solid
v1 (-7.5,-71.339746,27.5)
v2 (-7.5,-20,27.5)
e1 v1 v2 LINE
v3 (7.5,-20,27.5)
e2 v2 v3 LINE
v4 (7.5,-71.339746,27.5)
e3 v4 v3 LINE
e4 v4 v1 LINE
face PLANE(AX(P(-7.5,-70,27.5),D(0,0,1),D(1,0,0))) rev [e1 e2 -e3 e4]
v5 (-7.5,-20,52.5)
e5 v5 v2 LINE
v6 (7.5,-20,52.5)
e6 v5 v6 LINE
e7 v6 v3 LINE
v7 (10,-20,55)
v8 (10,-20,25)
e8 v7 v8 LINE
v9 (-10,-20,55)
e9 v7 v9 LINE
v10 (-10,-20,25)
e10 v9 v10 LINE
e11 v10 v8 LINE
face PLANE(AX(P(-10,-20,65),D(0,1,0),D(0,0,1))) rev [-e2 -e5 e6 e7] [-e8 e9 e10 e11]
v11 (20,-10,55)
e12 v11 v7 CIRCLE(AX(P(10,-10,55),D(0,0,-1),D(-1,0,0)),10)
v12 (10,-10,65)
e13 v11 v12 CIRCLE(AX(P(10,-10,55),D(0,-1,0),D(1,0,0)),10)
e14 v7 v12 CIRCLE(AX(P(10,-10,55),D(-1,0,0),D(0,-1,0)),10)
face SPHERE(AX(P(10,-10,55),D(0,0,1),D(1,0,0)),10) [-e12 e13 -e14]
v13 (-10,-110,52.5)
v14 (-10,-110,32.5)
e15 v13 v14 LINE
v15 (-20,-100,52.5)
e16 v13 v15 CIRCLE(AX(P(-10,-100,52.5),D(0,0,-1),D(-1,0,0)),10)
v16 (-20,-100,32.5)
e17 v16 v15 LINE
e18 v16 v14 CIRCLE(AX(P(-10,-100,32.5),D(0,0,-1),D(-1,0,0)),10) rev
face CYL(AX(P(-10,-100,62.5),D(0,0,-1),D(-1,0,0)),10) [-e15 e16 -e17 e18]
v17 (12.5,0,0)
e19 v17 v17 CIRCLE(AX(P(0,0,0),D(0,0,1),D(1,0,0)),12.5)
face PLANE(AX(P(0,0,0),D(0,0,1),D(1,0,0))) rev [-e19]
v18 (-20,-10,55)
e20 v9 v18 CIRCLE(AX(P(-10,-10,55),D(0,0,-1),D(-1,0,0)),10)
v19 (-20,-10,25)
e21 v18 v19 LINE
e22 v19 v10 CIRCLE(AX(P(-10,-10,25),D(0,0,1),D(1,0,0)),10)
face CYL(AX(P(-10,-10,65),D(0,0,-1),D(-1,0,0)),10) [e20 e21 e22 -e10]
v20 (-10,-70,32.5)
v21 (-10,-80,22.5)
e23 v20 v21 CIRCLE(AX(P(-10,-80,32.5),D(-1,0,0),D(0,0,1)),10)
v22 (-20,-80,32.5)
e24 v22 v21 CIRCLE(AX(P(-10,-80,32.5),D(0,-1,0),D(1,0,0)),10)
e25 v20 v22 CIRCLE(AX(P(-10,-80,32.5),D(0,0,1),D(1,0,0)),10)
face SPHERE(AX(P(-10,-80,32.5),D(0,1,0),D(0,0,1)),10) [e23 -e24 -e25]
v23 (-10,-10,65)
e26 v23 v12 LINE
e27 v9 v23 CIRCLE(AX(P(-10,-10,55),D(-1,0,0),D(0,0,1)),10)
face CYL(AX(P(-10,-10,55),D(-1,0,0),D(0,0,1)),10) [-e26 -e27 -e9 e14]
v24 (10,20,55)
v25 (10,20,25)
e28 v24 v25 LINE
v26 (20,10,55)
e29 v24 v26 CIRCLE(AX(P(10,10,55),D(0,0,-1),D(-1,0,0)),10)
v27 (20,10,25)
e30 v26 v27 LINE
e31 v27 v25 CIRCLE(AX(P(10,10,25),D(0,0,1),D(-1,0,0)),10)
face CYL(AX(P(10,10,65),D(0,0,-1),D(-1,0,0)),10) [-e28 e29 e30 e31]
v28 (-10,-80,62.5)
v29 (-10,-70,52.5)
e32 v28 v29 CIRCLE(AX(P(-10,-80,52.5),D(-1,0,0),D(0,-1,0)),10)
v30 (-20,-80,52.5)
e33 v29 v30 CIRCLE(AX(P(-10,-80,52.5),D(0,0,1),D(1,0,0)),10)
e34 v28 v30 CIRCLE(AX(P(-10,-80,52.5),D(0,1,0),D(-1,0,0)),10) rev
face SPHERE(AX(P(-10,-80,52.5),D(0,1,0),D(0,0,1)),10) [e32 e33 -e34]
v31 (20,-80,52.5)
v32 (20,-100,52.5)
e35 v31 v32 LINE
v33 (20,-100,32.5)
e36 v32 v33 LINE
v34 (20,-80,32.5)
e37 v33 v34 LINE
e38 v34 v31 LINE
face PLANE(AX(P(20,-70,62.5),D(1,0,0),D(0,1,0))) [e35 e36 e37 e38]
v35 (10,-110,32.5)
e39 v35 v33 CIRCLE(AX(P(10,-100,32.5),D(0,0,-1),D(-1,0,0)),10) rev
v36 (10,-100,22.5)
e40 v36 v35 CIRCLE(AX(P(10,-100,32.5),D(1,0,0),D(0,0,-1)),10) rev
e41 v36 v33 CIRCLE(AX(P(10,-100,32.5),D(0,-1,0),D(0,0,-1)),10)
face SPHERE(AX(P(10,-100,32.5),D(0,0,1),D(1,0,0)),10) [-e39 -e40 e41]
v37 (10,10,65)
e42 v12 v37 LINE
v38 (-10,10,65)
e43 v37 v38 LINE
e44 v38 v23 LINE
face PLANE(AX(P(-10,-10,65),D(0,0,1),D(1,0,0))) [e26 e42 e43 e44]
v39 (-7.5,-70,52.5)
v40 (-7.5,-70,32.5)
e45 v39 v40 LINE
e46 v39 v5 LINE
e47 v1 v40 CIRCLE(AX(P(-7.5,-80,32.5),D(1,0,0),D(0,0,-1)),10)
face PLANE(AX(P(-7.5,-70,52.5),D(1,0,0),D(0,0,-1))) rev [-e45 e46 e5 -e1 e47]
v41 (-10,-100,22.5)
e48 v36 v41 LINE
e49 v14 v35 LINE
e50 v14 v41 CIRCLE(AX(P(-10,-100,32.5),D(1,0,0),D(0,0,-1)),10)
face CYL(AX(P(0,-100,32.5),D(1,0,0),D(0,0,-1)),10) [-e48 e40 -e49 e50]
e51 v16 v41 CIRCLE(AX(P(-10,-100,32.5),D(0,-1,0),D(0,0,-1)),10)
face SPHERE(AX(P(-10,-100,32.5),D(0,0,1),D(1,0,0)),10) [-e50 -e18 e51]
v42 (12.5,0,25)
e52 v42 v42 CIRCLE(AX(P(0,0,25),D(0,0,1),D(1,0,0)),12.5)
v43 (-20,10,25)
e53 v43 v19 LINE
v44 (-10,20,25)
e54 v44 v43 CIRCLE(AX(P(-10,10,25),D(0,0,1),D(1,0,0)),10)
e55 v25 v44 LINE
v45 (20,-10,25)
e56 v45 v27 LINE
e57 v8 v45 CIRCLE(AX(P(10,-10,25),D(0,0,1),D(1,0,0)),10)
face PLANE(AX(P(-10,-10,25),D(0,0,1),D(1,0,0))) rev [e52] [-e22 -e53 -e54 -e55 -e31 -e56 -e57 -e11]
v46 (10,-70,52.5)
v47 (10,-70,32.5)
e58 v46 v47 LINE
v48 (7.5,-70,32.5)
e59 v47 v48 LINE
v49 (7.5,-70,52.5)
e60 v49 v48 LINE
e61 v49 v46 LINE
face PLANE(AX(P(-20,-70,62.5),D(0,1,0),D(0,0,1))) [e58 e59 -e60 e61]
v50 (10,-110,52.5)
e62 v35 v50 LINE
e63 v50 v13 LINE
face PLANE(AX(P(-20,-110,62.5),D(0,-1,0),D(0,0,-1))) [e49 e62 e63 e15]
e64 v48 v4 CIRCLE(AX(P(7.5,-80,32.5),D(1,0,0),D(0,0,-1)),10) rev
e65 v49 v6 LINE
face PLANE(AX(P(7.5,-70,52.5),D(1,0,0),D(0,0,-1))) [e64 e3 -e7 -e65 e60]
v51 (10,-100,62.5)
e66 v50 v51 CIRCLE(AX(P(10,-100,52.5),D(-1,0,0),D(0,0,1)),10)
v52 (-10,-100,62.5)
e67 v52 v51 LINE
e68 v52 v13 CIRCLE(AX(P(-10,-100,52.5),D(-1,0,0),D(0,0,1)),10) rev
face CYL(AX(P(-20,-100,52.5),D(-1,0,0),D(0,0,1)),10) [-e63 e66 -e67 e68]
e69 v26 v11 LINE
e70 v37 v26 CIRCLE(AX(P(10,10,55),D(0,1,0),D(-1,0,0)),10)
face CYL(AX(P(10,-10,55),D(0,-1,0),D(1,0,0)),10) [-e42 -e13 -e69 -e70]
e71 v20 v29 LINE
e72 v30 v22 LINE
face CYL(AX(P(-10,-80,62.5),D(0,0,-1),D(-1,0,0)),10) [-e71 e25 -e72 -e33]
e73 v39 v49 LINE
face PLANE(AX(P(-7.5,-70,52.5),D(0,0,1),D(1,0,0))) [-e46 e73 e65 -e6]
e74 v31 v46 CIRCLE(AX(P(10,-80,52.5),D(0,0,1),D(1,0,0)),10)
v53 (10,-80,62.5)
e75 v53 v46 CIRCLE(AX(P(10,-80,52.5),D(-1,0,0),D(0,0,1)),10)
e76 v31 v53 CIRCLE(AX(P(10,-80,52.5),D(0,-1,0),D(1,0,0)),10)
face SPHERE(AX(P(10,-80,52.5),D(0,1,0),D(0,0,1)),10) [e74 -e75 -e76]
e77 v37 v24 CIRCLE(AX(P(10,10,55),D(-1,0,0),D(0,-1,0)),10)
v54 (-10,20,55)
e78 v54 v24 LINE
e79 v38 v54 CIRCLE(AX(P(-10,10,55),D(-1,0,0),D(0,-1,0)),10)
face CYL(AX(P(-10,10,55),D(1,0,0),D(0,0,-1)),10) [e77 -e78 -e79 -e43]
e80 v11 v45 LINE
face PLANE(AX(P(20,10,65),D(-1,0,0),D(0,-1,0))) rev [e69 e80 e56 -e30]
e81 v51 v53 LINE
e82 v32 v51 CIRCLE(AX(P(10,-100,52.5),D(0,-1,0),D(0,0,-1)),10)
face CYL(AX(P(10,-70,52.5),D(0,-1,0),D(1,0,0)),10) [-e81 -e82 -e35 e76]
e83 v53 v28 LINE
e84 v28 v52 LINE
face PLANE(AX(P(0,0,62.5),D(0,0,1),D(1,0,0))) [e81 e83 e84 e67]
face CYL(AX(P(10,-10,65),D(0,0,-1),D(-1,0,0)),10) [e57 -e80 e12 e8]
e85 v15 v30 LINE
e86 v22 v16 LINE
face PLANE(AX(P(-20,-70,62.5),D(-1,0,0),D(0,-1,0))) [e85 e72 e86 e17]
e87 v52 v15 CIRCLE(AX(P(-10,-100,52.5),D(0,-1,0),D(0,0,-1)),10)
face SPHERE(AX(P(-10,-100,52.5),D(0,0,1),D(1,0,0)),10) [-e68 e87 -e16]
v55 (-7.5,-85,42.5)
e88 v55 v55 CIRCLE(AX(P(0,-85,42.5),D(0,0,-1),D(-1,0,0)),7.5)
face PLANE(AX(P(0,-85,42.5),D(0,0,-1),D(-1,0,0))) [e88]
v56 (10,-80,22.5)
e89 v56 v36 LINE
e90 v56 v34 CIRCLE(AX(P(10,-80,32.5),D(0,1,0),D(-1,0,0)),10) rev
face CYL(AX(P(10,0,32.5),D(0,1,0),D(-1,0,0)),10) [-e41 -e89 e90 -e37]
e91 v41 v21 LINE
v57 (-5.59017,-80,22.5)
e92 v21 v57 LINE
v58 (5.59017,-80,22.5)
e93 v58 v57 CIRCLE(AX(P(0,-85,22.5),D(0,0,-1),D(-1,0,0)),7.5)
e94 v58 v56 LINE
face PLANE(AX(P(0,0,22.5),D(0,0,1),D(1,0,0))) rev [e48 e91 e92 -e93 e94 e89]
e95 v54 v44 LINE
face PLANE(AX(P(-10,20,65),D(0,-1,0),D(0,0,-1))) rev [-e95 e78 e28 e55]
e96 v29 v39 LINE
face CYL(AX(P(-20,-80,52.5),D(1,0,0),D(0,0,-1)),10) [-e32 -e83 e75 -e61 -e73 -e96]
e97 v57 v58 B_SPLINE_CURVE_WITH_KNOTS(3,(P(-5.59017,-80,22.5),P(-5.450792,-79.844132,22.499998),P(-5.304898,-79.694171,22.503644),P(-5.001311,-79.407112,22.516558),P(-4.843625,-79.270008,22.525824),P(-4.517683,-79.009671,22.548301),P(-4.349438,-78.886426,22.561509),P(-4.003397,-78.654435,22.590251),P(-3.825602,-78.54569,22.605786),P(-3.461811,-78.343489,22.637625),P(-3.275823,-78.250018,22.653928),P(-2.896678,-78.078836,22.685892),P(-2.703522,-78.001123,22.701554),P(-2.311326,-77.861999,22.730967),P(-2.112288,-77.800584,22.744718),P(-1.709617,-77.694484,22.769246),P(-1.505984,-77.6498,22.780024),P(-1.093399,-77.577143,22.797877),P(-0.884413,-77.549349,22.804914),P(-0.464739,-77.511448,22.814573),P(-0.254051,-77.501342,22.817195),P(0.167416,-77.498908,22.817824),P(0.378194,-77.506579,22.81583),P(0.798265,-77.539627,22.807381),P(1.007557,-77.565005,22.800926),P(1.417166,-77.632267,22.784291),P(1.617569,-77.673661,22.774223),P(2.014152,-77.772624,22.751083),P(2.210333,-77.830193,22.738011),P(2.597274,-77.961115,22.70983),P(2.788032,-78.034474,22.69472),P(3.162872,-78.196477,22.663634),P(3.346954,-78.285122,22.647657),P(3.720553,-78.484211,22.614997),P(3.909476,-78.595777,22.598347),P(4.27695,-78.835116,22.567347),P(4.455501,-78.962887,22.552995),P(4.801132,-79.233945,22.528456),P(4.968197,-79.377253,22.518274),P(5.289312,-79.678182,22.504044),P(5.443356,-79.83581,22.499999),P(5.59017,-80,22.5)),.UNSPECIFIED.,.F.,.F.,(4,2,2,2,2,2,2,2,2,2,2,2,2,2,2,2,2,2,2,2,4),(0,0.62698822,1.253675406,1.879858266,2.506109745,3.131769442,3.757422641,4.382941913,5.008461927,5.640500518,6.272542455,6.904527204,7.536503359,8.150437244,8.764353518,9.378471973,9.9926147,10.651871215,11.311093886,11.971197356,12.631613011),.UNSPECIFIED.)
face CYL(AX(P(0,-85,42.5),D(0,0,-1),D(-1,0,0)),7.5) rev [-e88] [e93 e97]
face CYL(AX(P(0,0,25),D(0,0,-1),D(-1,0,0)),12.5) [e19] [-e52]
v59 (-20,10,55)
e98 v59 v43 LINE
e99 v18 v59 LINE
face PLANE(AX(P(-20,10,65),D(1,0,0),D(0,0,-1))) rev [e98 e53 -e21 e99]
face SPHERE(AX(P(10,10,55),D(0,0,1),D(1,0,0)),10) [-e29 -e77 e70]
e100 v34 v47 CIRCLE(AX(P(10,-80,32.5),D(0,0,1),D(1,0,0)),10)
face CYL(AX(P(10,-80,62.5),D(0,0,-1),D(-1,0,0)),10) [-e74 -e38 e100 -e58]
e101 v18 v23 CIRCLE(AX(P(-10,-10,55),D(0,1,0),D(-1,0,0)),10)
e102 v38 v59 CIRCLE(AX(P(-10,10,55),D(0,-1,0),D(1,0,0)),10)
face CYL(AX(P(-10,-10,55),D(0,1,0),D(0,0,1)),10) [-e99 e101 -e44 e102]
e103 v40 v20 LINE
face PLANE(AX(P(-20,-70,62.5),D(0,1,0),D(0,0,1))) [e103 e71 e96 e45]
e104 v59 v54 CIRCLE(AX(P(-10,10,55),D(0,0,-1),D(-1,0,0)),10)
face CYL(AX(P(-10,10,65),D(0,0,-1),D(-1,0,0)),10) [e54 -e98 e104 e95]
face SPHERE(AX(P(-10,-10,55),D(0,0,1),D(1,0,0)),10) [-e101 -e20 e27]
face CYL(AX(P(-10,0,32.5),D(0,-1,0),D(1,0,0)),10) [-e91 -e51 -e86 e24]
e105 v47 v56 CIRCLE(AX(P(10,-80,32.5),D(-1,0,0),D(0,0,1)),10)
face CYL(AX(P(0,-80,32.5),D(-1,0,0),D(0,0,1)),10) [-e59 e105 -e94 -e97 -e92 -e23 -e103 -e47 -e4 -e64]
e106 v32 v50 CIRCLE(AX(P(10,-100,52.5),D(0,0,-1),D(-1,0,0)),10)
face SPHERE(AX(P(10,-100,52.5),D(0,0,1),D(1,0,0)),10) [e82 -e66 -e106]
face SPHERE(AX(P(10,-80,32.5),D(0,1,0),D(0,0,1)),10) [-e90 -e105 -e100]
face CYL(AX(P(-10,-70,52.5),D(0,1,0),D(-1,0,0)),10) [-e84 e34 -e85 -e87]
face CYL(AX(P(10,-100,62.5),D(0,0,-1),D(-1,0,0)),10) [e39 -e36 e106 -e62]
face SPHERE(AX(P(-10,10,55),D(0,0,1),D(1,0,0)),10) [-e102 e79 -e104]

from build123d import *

# Parameters (mm, degrees)
ESQUISSE1_R             = 12.5
BOSS_EXTRU_1_DEPTH      = 25
BOSS_EXTRU_2_DEPTH      = 40
CONG_1_R                = 10
ESQUISSE5_W             = 15
ESQUISSE5_H             = 25
BOSS_EXTRU_3_DEPTH      = 50
BOSS_EXTRU_4_DEPTH      = 5
BOSS_EXTRU_4_DEPTH_BACK = 35
ESQUISSE6_W             = 40
ESQUISSE6_H             = 40
CONG_2_R                = 10
CONG_3_R                = 10
ESQUISSE8_R             = 7.5
ENL_V_MAT_EXTRU_2_DEPTH = 20
CONG_4_R                = 10


with BuildPart() as part:
    # Esquisse1 → Boss.-Extru.1 (new body)
    with BuildSketch(Plane.XY):
        Circle(ESQUISSE1_R)
    extrude(amount=BOSS_EXTRU_1_DEPTH)

    # Esquisse2 → Boss.-Extru.2 (add)
    with BuildSketch(Plane.XY.offset(25)):
        with BuildLine():
            Line((-10, 20), (10, 20))
            ThreePointArc((10, 20), (17.071067812, 17.071067812), (20, 10))
            Line((20, 10), (20, -10))
            ThreePointArc((20, -10), (17.071067812, -17.071067812), (10, -20))
            Line((10, -20), (-10, -20))
            ThreePointArc((-10, -20), (-17.071067812, -17.071067812), (-20, -10))
            Line((-20, -10), (-20, 10))
            ThreePointArc((-20, 10), (-17.071067812, 17.071067812), (-10, 20))
        make_face()
    extrude(amount=BOSS_EXTRU_2_DEPTH)

    # Congé1
    cong_1_edges = [part.edges().sort_by_distance(p)[0] for p in [
        (0, 20, 65),
        (-17.071067812, 17.071067812, 65),
        (-20, 0, 65),
        (-17.071067812, -17.071067812, 65),
        (0, -20, 65),
        (17.071067812, -17.071067812, 65),
        (20, 0, 65),
        (17.071067812, 17.071067812, 65),
    ]]
    fillet(cong_1_edges, radius=CONG_1_R)

    # Esquisse5 → Boss.-Extru.3 (add)
    with BuildSketch(Plane.XZ.offset(20)):
        with Locations((0, 40)):
            Rectangle(ESQUISSE5_W, ESQUISSE5_H)
    extrude(amount=BOSS_EXTRU_3_DEPTH)

    # Esquisse6 → Boss.-Extru.4 (add, two sides: drawn at the far end of the back side and taken through both)
    with BuildSketch(Plane(origin=(0, 0, 27.5), x_dir=(-1, 0, 0), z_dir=(0, 0, -1)).offset(-BOSS_EXTRU_4_DEPTH_BACK)):
        with Locations((0, -90)):
            Rectangle(ESQUISSE6_W, ESQUISSE6_H)
    extrude(amount=BOSS_EXTRU_4_DEPTH + BOSS_EXTRU_4_DEPTH_BACK)

    # Congé2
    cong_2_edges = [part.edges().sort_by_distance(p)[0] for p in [
        (-20, -110, 42.5),
        (0, -110, 62.5),
        (20, -110, 42.5),
        (0, -110, 22.5),
    ]]
    fillet(cong_2_edges, radius=CONG_2_R)

    # Congé3
    # the kernel refuses this fillet: 10 mm, written as the material it takes off along each edge
    with BuildSketch(Plane(origin=(10, -100, 32.5), x_dir=(1, 0, 0), z_dir=(0, 0, -1))) as cong_3_piece_1_section:
        Polygon((0, 0), (CONG_3_R, 0), (CONG_3_R, CONG_3_R), (0, CONG_3_R), align=None)
    cong_3_piece_1 = extrude(amount=CONG_3_R, mode=Mode.PRIVATE)
    cong_3_piece_1 = cong_3_piece_1 - Plane(origin=(10, -100, 32.5), x_dir=(-0.7071067811865475, 0.7071067811865475, 0), z_dir=(0, 0, -1)) * Sphere(CONG_3_R, mode=Mode.PRIVATE)
    add(cong_3_piece_1, mode=Mode.SUBTRACT)
    with BuildSketch(Plane(origin=(-10, -100, 32.5), x_dir=(0, 0, -1), z_dir=(-1, 0, 0))) as cong_3_piece_2_section:
        Polygon((0, 0), (CONG_3_R, 0), (CONG_3_R, CONG_3_R), (0, CONG_3_R), align=None)
    cong_3_piece_2 = extrude(amount=CONG_3_R, mode=Mode.PRIVATE)
    cong_3_piece_2 = cong_3_piece_2 - Plane(origin=(-10, -100, 32.5), x_dir=(0, 0.7071067811865475, 0.7071067811865475), z_dir=(-1, 0, 0)) * Sphere(CONG_3_R, mode=Mode.PRIVATE)
    add(cong_3_piece_2, mode=Mode.SUBTRACT)
    with BuildSketch(Plane(origin=(10, -100, 52.5), x_dir=(1, 0, 0), z_dir=(0, 0, 1))) as cong_3_piece_3_section:
        Polygon((0, 0), (CONG_3_R, 0), (CONG_3_R, -CONG_3_R), (0, -CONG_3_R), align=None)
    cong_3_piece_3 = extrude(amount=CONG_3_R, mode=Mode.PRIVATE)
    cong_3_piece_3 = cong_3_piece_3 - Plane(origin=(10, -100, 52.5), x_dir=(-0.7071067811865475, 0.7071067811865475, 0), z_dir=(0, 0, 1)) * Sphere(CONG_3_R, mode=Mode.PRIVATE)
    add(cong_3_piece_3, mode=Mode.SUBTRACT)
    with BuildSketch(Plane(origin=(-10, -100, 52.5), x_dir=(0, 0, 1), z_dir=(-1, 0, 0))) as cong_3_piece_4_section:
        Polygon((0, 0), (CONG_3_R, 0), (CONG_3_R, -CONG_3_R), (0, -CONG_3_R), align=None)
    cong_3_piece_4 = extrude(amount=CONG_3_R, mode=Mode.PRIVATE)
    cong_3_piece_4 = cong_3_piece_4 - Plane(origin=(-10, -100, 52.5), x_dir=(0, 0.7071067811865475, -0.7071067811865475), z_dir=(-1, 0, 0)) * Sphere(CONG_3_R, mode=Mode.PRIVATE)
    add(cong_3_piece_4, mode=Mode.SUBTRACT)
    with BuildSketch(Plane(origin=(20, -45, 62.5), x_dir=(-1, 0, 0), z_dir=(0, -1, 0)), Plane(origin=(-20, -100, 22.5), x_dir=(0, 0, 1), z_dir=(0, 1, 0))) as cong_3_piece_5:
        with BuildLine():
            CenterArc((CONG_3_R, CONG_3_R), CONG_3_R, 180, 90)
            Line((0, CONG_3_R), (0, 0))
            Line((0, 0), (CONG_3_R, 0))
        make_face()
    extrude(amount=55, mode=Mode.SUBTRACT)
    with BuildSketch(Plane(origin=(20, -45, 22.5), x_dir=(-1, 0, 0), z_dir=(0, -1, 0)), Plane(origin=(-20, -100, 62.5), x_dir=(0, 0, -1), z_dir=(0, 1, 0))) as cong_3_piece_6:
        with BuildLine():
            CenterArc((CONG_3_R, -CONG_3_R), CONG_3_R, 90, 90)
            Line((0, -CONG_3_R), (0, 0))
            Line((0, 0), (CONG_3_R, 0))
        make_face()
    extrude(amount=55, mode=Mode.SUBTRACT)

    # Esquisse8 → Enlèv. mat.-Extru.2 (cut)
    with BuildSketch(Plane(origin=(0, 0, 22.5), x_dir=(-1, 0, 0), z_dir=(0, 0, -1))):
        with Locations((0, -85)):
            Circle(ESQUISSE8_R)
    extrude(amount=-ENL_V_MAT_EXTRU_2_DEPTH, mode=Mode.SUBTRACT)

    # Congé4
    # the kernel refuses this fillet: 10 mm, written as the material it takes off along each edge
    with BuildSketch(Plane(origin=(-10, -70, 52.5), x_dir=(0, 0, 1), z_dir=(1, 0, 0))) as cong_4_piece_1:
        with BuildLine():
            CenterArc((10 - CONG_4_R, CONG_4_R), CONG_4_R, 270, 90)
            Line((10 - CONG_4_R, 0), (10, 0))
            Line((10, 0), (10, CONG_4_R))
        make_face()
    revolve(axis=Axis((-10, -70, 52.5), (0, -1, 0)), revolution_arc=90, mode=Mode.SUBTRACT)
    with BuildSketch(Plane(origin=(-10, -70, 62.5), x_dir=(0, 0, -1), z_dir=(1, 0, 0)), Plane(origin=(20, -70, 52.5), x_dir=(-1, 0, 0), z_dir=(0, 0, -1))) as cong_4_piece_2:
        with BuildLine():
            CenterArc((CONG_4_R, -CONG_4_R), CONG_4_R, 90, 90)
            Line((0, -CONG_4_R), (0, 0))
            Line((0, 0), (CONG_4_R, 0))
        make_face()
    extrude(amount=20, mode=Mode.SUBTRACT)
    with BuildSketch(Plane(origin=(10, -70, 52.5), x_dir=(0, 0, 1), z_dir=(-1, 0, 0))) as cong_4_piece_3:
        with BuildLine():
            CenterArc((10 - CONG_4_R, -CONG_4_R), CONG_4_R, 0, 90)
            Line((10, -CONG_4_R), (10, 0))
            Line((10, 0), (10 - CONG_4_R, 0))
        make_face()
    revolve(axis=Axis((10, -70, 52.5), (0, 1, 0)), revolution_arc=90, mode=Mode.SUBTRACT)
    with BuildSketch(Plane(origin=(10, -70, 32.5), x_dir=(1, 0, 0), z_dir=(0, 0, 1))) as cong_4_piece_4:
        with BuildLine():
            CenterArc((10 - CONG_4_R, -CONG_4_R), CONG_4_R, 0, 90)
            Line((10, -CONG_4_R), (10, 0))
            Line((10, 0), (10 - CONG_4_R, 0))
        make_face()
    revolve(axis=Axis((10, -70, 32.5), (0, 1, 0)), revolution_arc=90, mode=Mode.SUBTRACT)
    with BuildSketch(Plane(origin=(-10, -70, 22.5), x_dir=(0, 0, 1), z_dir=(1, 0, 0))) as cong_4_piece_5_section:
        with BuildLine():
            CenterArc((CONG_4_R, CONG_4_R), CONG_4_R, 180, 90)
            Line((0, CONG_4_R), (0, 0))
            Line((0, 0), (CONG_4_R, 0))
        make_face()
    cong_4_piece_5 = extrude(amount=20, mode=Mode.PRIVATE)
    cong_4_piece_5 = split(cong_4_piece_5, bisect_by=Plane(origin=(-8.75, -70.240083817, 27.5), z_dir=(0, 0, 1)), keep=Keep.TOP, mode=Mode.PRIVATE)
    cong_4_piece_5 = split(cong_4_piece_5, bisect_by=Plane(origin=(-7.5, -70.240083817, 29.132507845), z_dir=(-1, 0, 0)), keep=Keep.TOP, mode=Mode.PRIVATE)
    add(cong_4_piece_5, mode=Mode.SUBTRACT)
    with BuildSketch(Plane(origin=(-10, -70, 22.5), x_dir=(0, 0, 1), z_dir=(1, 0, 0))) as cong_4_piece_6_section:
        with BuildLine():
            CenterArc((CONG_4_R, CONG_4_R), CONG_4_R, 180, 90)
            Line((0, CONG_4_R), (0, 0))
            Line((0, 0), (CONG_4_R, 0))
        make_face()
    cong_4_piece_6 = extrude(amount=20, mode=Mode.PRIVATE)
    cong_4_piece_6 = split(cong_4_piece_6, bisect_by=Plane(origin=(-8.75, -72.5512006, 27.5), z_dir=(0, 0, -1)), keep=Keep.TOP, mode=Mode.PRIVATE)
    cong_4_piece_6 = split(cong_4_piece_6, bisect_by=Plane(origin=(-7.5, -72.5512006, 24.143917643), z_dir=(-1, 0, 0)), keep=Keep.TOP, mode=Mode.PRIVATE)
    add(cong_4_piece_6, mode=Mode.SUBTRACT)
    with BuildSketch(Plane(origin=(-10, -70, 22.5), x_dir=(0, 0, 1), z_dir=(1, 0, 0))) as cong_4_piece_7_section:
        with BuildLine():
            CenterArc((CONG_4_R, CONG_4_R), CONG_4_R, 180, 90)
            Line((0, CONG_4_R), (0, 0))
            Line((0, 0), (CONG_4_R, 0))
        make_face()
    cong_4_piece_7 = extrude(amount=20, mode=Mode.PRIVATE)
    cong_4_piece_7 = split(cong_4_piece_7, bisect_by=Plane(origin=(0, -72.5512006, 27.5), z_dir=(0, 0, -1)), keep=Keep.TOP, mode=Mode.PRIVATE)
    cong_4_piece_7 = split(cong_4_piece_7, bisect_by=Plane(origin=(7.5, -72.5512006, 24.143917643), z_dir=(-1, 0, 0)), keep=Keep.TOP, mode=Mode.PRIVATE)
    cong_4_piece_7 = split(cong_4_piece_7, bisect_by=Plane(origin=(-7.5, -72.5512006, 24.143917643), z_dir=(1, 0, 0)), keep=Keep.TOP, mode=Mode.PRIVATE)
    add(cong_4_piece_7, mode=Mode.SUBTRACT)
    with BuildSketch(Plane(origin=(-10, -70, 22.5), x_dir=(0, 0, 1), z_dir=(1, 0, 0))) as cong_4_piece_8_section:
        with BuildLine():
            CenterArc((CONG_4_R, CONG_4_R), CONG_4_R, 180, 90)
            Line((0, CONG_4_R), (0, 0))
            Line((0, 0), (CONG_4_R, 0))
        make_face()
    cong_4_piece_8 = extrude(amount=20, mode=Mode.PRIVATE)
    cong_4_piece_8 = split(cong_4_piece_8, bisect_by=Plane(origin=(8.75, -70.240083817, 27.5), z_dir=(0, 0, 1)), keep=Keep.TOP, mode=Mode.PRIVATE)
    cong_4_piece_8 = split(cong_4_piece_8, bisect_by=Plane(origin=(7.5, -70.240083817, 29.132507845), z_dir=(1, 0, 0)), keep=Keep.TOP, mode=Mode.PRIVATE)
    add(cong_4_piece_8, mode=Mode.SUBTRACT)
    with BuildSketch(Plane(origin=(-10, -70, 22.5), x_dir=(0, 0, 1), z_dir=(1, 0, 0))) as cong_4_piece_9_section:
        with BuildLine():
            CenterArc((CONG_4_R, CONG_4_R), CONG_4_R, 180, 90)
            Line((0, CONG_4_R), (0, 0))
            Line((0, 0), (CONG_4_R, 0))
        make_face()
    cong_4_piece_9 = extrude(amount=20, mode=Mode.PRIVATE)
    cong_4_piece_9 = split(cong_4_piece_9, bisect_by=Plane(origin=(8.75, -72.5512006, 27.5), z_dir=(0, 0, -1)), keep=Keep.TOP, mode=Mode.PRIVATE)
    cong_4_piece_9 = split(cong_4_piece_9, bisect_by=Plane(origin=(7.5, -72.5512006, 24.143917643), z_dir=(1, 0, 0)), keep=Keep.TOP, mode=Mode.PRIVATE)
    add(cong_4_piece_9, mode=Mode.SUBTRACT)
    with BuildSketch(Plane(origin=(-10, -70, 32.5), x_dir=(-1, 0, 0), z_dir=(0, 0, 1))) as cong_4_piece_10:
        with BuildLine():
            CenterArc((10 - CONG_4_R, CONG_4_R), CONG_4_R, 270, 90)
            Line((10, CONG_4_R), (10, 0))
            Line((10, 0), (10 - CONG_4_R, 0))
        make_face()
    revolve(axis=Axis((-10, -70, 32.5), (0, -1, 0)), revolution_arc=90, mode=Mode.SUBTRACT)
    with BuildSketch(Plane(origin=(-20, -70, 32.5), x_dir=(0, -1, 0), z_dir=(0, 0, 1))) as cong_4_piece_11:
        with BuildLine():
            CenterArc((CONG_4_R, CONG_4_R), CONG_4_R, 180, 90)
            Line((0, CONG_4_R), (0, 0))
            Line((0, 0), (CONG_4_R, 0))
        make_face()
    extrude(amount=20, mode=Mode.SUBTRACT)


solid = part.part
